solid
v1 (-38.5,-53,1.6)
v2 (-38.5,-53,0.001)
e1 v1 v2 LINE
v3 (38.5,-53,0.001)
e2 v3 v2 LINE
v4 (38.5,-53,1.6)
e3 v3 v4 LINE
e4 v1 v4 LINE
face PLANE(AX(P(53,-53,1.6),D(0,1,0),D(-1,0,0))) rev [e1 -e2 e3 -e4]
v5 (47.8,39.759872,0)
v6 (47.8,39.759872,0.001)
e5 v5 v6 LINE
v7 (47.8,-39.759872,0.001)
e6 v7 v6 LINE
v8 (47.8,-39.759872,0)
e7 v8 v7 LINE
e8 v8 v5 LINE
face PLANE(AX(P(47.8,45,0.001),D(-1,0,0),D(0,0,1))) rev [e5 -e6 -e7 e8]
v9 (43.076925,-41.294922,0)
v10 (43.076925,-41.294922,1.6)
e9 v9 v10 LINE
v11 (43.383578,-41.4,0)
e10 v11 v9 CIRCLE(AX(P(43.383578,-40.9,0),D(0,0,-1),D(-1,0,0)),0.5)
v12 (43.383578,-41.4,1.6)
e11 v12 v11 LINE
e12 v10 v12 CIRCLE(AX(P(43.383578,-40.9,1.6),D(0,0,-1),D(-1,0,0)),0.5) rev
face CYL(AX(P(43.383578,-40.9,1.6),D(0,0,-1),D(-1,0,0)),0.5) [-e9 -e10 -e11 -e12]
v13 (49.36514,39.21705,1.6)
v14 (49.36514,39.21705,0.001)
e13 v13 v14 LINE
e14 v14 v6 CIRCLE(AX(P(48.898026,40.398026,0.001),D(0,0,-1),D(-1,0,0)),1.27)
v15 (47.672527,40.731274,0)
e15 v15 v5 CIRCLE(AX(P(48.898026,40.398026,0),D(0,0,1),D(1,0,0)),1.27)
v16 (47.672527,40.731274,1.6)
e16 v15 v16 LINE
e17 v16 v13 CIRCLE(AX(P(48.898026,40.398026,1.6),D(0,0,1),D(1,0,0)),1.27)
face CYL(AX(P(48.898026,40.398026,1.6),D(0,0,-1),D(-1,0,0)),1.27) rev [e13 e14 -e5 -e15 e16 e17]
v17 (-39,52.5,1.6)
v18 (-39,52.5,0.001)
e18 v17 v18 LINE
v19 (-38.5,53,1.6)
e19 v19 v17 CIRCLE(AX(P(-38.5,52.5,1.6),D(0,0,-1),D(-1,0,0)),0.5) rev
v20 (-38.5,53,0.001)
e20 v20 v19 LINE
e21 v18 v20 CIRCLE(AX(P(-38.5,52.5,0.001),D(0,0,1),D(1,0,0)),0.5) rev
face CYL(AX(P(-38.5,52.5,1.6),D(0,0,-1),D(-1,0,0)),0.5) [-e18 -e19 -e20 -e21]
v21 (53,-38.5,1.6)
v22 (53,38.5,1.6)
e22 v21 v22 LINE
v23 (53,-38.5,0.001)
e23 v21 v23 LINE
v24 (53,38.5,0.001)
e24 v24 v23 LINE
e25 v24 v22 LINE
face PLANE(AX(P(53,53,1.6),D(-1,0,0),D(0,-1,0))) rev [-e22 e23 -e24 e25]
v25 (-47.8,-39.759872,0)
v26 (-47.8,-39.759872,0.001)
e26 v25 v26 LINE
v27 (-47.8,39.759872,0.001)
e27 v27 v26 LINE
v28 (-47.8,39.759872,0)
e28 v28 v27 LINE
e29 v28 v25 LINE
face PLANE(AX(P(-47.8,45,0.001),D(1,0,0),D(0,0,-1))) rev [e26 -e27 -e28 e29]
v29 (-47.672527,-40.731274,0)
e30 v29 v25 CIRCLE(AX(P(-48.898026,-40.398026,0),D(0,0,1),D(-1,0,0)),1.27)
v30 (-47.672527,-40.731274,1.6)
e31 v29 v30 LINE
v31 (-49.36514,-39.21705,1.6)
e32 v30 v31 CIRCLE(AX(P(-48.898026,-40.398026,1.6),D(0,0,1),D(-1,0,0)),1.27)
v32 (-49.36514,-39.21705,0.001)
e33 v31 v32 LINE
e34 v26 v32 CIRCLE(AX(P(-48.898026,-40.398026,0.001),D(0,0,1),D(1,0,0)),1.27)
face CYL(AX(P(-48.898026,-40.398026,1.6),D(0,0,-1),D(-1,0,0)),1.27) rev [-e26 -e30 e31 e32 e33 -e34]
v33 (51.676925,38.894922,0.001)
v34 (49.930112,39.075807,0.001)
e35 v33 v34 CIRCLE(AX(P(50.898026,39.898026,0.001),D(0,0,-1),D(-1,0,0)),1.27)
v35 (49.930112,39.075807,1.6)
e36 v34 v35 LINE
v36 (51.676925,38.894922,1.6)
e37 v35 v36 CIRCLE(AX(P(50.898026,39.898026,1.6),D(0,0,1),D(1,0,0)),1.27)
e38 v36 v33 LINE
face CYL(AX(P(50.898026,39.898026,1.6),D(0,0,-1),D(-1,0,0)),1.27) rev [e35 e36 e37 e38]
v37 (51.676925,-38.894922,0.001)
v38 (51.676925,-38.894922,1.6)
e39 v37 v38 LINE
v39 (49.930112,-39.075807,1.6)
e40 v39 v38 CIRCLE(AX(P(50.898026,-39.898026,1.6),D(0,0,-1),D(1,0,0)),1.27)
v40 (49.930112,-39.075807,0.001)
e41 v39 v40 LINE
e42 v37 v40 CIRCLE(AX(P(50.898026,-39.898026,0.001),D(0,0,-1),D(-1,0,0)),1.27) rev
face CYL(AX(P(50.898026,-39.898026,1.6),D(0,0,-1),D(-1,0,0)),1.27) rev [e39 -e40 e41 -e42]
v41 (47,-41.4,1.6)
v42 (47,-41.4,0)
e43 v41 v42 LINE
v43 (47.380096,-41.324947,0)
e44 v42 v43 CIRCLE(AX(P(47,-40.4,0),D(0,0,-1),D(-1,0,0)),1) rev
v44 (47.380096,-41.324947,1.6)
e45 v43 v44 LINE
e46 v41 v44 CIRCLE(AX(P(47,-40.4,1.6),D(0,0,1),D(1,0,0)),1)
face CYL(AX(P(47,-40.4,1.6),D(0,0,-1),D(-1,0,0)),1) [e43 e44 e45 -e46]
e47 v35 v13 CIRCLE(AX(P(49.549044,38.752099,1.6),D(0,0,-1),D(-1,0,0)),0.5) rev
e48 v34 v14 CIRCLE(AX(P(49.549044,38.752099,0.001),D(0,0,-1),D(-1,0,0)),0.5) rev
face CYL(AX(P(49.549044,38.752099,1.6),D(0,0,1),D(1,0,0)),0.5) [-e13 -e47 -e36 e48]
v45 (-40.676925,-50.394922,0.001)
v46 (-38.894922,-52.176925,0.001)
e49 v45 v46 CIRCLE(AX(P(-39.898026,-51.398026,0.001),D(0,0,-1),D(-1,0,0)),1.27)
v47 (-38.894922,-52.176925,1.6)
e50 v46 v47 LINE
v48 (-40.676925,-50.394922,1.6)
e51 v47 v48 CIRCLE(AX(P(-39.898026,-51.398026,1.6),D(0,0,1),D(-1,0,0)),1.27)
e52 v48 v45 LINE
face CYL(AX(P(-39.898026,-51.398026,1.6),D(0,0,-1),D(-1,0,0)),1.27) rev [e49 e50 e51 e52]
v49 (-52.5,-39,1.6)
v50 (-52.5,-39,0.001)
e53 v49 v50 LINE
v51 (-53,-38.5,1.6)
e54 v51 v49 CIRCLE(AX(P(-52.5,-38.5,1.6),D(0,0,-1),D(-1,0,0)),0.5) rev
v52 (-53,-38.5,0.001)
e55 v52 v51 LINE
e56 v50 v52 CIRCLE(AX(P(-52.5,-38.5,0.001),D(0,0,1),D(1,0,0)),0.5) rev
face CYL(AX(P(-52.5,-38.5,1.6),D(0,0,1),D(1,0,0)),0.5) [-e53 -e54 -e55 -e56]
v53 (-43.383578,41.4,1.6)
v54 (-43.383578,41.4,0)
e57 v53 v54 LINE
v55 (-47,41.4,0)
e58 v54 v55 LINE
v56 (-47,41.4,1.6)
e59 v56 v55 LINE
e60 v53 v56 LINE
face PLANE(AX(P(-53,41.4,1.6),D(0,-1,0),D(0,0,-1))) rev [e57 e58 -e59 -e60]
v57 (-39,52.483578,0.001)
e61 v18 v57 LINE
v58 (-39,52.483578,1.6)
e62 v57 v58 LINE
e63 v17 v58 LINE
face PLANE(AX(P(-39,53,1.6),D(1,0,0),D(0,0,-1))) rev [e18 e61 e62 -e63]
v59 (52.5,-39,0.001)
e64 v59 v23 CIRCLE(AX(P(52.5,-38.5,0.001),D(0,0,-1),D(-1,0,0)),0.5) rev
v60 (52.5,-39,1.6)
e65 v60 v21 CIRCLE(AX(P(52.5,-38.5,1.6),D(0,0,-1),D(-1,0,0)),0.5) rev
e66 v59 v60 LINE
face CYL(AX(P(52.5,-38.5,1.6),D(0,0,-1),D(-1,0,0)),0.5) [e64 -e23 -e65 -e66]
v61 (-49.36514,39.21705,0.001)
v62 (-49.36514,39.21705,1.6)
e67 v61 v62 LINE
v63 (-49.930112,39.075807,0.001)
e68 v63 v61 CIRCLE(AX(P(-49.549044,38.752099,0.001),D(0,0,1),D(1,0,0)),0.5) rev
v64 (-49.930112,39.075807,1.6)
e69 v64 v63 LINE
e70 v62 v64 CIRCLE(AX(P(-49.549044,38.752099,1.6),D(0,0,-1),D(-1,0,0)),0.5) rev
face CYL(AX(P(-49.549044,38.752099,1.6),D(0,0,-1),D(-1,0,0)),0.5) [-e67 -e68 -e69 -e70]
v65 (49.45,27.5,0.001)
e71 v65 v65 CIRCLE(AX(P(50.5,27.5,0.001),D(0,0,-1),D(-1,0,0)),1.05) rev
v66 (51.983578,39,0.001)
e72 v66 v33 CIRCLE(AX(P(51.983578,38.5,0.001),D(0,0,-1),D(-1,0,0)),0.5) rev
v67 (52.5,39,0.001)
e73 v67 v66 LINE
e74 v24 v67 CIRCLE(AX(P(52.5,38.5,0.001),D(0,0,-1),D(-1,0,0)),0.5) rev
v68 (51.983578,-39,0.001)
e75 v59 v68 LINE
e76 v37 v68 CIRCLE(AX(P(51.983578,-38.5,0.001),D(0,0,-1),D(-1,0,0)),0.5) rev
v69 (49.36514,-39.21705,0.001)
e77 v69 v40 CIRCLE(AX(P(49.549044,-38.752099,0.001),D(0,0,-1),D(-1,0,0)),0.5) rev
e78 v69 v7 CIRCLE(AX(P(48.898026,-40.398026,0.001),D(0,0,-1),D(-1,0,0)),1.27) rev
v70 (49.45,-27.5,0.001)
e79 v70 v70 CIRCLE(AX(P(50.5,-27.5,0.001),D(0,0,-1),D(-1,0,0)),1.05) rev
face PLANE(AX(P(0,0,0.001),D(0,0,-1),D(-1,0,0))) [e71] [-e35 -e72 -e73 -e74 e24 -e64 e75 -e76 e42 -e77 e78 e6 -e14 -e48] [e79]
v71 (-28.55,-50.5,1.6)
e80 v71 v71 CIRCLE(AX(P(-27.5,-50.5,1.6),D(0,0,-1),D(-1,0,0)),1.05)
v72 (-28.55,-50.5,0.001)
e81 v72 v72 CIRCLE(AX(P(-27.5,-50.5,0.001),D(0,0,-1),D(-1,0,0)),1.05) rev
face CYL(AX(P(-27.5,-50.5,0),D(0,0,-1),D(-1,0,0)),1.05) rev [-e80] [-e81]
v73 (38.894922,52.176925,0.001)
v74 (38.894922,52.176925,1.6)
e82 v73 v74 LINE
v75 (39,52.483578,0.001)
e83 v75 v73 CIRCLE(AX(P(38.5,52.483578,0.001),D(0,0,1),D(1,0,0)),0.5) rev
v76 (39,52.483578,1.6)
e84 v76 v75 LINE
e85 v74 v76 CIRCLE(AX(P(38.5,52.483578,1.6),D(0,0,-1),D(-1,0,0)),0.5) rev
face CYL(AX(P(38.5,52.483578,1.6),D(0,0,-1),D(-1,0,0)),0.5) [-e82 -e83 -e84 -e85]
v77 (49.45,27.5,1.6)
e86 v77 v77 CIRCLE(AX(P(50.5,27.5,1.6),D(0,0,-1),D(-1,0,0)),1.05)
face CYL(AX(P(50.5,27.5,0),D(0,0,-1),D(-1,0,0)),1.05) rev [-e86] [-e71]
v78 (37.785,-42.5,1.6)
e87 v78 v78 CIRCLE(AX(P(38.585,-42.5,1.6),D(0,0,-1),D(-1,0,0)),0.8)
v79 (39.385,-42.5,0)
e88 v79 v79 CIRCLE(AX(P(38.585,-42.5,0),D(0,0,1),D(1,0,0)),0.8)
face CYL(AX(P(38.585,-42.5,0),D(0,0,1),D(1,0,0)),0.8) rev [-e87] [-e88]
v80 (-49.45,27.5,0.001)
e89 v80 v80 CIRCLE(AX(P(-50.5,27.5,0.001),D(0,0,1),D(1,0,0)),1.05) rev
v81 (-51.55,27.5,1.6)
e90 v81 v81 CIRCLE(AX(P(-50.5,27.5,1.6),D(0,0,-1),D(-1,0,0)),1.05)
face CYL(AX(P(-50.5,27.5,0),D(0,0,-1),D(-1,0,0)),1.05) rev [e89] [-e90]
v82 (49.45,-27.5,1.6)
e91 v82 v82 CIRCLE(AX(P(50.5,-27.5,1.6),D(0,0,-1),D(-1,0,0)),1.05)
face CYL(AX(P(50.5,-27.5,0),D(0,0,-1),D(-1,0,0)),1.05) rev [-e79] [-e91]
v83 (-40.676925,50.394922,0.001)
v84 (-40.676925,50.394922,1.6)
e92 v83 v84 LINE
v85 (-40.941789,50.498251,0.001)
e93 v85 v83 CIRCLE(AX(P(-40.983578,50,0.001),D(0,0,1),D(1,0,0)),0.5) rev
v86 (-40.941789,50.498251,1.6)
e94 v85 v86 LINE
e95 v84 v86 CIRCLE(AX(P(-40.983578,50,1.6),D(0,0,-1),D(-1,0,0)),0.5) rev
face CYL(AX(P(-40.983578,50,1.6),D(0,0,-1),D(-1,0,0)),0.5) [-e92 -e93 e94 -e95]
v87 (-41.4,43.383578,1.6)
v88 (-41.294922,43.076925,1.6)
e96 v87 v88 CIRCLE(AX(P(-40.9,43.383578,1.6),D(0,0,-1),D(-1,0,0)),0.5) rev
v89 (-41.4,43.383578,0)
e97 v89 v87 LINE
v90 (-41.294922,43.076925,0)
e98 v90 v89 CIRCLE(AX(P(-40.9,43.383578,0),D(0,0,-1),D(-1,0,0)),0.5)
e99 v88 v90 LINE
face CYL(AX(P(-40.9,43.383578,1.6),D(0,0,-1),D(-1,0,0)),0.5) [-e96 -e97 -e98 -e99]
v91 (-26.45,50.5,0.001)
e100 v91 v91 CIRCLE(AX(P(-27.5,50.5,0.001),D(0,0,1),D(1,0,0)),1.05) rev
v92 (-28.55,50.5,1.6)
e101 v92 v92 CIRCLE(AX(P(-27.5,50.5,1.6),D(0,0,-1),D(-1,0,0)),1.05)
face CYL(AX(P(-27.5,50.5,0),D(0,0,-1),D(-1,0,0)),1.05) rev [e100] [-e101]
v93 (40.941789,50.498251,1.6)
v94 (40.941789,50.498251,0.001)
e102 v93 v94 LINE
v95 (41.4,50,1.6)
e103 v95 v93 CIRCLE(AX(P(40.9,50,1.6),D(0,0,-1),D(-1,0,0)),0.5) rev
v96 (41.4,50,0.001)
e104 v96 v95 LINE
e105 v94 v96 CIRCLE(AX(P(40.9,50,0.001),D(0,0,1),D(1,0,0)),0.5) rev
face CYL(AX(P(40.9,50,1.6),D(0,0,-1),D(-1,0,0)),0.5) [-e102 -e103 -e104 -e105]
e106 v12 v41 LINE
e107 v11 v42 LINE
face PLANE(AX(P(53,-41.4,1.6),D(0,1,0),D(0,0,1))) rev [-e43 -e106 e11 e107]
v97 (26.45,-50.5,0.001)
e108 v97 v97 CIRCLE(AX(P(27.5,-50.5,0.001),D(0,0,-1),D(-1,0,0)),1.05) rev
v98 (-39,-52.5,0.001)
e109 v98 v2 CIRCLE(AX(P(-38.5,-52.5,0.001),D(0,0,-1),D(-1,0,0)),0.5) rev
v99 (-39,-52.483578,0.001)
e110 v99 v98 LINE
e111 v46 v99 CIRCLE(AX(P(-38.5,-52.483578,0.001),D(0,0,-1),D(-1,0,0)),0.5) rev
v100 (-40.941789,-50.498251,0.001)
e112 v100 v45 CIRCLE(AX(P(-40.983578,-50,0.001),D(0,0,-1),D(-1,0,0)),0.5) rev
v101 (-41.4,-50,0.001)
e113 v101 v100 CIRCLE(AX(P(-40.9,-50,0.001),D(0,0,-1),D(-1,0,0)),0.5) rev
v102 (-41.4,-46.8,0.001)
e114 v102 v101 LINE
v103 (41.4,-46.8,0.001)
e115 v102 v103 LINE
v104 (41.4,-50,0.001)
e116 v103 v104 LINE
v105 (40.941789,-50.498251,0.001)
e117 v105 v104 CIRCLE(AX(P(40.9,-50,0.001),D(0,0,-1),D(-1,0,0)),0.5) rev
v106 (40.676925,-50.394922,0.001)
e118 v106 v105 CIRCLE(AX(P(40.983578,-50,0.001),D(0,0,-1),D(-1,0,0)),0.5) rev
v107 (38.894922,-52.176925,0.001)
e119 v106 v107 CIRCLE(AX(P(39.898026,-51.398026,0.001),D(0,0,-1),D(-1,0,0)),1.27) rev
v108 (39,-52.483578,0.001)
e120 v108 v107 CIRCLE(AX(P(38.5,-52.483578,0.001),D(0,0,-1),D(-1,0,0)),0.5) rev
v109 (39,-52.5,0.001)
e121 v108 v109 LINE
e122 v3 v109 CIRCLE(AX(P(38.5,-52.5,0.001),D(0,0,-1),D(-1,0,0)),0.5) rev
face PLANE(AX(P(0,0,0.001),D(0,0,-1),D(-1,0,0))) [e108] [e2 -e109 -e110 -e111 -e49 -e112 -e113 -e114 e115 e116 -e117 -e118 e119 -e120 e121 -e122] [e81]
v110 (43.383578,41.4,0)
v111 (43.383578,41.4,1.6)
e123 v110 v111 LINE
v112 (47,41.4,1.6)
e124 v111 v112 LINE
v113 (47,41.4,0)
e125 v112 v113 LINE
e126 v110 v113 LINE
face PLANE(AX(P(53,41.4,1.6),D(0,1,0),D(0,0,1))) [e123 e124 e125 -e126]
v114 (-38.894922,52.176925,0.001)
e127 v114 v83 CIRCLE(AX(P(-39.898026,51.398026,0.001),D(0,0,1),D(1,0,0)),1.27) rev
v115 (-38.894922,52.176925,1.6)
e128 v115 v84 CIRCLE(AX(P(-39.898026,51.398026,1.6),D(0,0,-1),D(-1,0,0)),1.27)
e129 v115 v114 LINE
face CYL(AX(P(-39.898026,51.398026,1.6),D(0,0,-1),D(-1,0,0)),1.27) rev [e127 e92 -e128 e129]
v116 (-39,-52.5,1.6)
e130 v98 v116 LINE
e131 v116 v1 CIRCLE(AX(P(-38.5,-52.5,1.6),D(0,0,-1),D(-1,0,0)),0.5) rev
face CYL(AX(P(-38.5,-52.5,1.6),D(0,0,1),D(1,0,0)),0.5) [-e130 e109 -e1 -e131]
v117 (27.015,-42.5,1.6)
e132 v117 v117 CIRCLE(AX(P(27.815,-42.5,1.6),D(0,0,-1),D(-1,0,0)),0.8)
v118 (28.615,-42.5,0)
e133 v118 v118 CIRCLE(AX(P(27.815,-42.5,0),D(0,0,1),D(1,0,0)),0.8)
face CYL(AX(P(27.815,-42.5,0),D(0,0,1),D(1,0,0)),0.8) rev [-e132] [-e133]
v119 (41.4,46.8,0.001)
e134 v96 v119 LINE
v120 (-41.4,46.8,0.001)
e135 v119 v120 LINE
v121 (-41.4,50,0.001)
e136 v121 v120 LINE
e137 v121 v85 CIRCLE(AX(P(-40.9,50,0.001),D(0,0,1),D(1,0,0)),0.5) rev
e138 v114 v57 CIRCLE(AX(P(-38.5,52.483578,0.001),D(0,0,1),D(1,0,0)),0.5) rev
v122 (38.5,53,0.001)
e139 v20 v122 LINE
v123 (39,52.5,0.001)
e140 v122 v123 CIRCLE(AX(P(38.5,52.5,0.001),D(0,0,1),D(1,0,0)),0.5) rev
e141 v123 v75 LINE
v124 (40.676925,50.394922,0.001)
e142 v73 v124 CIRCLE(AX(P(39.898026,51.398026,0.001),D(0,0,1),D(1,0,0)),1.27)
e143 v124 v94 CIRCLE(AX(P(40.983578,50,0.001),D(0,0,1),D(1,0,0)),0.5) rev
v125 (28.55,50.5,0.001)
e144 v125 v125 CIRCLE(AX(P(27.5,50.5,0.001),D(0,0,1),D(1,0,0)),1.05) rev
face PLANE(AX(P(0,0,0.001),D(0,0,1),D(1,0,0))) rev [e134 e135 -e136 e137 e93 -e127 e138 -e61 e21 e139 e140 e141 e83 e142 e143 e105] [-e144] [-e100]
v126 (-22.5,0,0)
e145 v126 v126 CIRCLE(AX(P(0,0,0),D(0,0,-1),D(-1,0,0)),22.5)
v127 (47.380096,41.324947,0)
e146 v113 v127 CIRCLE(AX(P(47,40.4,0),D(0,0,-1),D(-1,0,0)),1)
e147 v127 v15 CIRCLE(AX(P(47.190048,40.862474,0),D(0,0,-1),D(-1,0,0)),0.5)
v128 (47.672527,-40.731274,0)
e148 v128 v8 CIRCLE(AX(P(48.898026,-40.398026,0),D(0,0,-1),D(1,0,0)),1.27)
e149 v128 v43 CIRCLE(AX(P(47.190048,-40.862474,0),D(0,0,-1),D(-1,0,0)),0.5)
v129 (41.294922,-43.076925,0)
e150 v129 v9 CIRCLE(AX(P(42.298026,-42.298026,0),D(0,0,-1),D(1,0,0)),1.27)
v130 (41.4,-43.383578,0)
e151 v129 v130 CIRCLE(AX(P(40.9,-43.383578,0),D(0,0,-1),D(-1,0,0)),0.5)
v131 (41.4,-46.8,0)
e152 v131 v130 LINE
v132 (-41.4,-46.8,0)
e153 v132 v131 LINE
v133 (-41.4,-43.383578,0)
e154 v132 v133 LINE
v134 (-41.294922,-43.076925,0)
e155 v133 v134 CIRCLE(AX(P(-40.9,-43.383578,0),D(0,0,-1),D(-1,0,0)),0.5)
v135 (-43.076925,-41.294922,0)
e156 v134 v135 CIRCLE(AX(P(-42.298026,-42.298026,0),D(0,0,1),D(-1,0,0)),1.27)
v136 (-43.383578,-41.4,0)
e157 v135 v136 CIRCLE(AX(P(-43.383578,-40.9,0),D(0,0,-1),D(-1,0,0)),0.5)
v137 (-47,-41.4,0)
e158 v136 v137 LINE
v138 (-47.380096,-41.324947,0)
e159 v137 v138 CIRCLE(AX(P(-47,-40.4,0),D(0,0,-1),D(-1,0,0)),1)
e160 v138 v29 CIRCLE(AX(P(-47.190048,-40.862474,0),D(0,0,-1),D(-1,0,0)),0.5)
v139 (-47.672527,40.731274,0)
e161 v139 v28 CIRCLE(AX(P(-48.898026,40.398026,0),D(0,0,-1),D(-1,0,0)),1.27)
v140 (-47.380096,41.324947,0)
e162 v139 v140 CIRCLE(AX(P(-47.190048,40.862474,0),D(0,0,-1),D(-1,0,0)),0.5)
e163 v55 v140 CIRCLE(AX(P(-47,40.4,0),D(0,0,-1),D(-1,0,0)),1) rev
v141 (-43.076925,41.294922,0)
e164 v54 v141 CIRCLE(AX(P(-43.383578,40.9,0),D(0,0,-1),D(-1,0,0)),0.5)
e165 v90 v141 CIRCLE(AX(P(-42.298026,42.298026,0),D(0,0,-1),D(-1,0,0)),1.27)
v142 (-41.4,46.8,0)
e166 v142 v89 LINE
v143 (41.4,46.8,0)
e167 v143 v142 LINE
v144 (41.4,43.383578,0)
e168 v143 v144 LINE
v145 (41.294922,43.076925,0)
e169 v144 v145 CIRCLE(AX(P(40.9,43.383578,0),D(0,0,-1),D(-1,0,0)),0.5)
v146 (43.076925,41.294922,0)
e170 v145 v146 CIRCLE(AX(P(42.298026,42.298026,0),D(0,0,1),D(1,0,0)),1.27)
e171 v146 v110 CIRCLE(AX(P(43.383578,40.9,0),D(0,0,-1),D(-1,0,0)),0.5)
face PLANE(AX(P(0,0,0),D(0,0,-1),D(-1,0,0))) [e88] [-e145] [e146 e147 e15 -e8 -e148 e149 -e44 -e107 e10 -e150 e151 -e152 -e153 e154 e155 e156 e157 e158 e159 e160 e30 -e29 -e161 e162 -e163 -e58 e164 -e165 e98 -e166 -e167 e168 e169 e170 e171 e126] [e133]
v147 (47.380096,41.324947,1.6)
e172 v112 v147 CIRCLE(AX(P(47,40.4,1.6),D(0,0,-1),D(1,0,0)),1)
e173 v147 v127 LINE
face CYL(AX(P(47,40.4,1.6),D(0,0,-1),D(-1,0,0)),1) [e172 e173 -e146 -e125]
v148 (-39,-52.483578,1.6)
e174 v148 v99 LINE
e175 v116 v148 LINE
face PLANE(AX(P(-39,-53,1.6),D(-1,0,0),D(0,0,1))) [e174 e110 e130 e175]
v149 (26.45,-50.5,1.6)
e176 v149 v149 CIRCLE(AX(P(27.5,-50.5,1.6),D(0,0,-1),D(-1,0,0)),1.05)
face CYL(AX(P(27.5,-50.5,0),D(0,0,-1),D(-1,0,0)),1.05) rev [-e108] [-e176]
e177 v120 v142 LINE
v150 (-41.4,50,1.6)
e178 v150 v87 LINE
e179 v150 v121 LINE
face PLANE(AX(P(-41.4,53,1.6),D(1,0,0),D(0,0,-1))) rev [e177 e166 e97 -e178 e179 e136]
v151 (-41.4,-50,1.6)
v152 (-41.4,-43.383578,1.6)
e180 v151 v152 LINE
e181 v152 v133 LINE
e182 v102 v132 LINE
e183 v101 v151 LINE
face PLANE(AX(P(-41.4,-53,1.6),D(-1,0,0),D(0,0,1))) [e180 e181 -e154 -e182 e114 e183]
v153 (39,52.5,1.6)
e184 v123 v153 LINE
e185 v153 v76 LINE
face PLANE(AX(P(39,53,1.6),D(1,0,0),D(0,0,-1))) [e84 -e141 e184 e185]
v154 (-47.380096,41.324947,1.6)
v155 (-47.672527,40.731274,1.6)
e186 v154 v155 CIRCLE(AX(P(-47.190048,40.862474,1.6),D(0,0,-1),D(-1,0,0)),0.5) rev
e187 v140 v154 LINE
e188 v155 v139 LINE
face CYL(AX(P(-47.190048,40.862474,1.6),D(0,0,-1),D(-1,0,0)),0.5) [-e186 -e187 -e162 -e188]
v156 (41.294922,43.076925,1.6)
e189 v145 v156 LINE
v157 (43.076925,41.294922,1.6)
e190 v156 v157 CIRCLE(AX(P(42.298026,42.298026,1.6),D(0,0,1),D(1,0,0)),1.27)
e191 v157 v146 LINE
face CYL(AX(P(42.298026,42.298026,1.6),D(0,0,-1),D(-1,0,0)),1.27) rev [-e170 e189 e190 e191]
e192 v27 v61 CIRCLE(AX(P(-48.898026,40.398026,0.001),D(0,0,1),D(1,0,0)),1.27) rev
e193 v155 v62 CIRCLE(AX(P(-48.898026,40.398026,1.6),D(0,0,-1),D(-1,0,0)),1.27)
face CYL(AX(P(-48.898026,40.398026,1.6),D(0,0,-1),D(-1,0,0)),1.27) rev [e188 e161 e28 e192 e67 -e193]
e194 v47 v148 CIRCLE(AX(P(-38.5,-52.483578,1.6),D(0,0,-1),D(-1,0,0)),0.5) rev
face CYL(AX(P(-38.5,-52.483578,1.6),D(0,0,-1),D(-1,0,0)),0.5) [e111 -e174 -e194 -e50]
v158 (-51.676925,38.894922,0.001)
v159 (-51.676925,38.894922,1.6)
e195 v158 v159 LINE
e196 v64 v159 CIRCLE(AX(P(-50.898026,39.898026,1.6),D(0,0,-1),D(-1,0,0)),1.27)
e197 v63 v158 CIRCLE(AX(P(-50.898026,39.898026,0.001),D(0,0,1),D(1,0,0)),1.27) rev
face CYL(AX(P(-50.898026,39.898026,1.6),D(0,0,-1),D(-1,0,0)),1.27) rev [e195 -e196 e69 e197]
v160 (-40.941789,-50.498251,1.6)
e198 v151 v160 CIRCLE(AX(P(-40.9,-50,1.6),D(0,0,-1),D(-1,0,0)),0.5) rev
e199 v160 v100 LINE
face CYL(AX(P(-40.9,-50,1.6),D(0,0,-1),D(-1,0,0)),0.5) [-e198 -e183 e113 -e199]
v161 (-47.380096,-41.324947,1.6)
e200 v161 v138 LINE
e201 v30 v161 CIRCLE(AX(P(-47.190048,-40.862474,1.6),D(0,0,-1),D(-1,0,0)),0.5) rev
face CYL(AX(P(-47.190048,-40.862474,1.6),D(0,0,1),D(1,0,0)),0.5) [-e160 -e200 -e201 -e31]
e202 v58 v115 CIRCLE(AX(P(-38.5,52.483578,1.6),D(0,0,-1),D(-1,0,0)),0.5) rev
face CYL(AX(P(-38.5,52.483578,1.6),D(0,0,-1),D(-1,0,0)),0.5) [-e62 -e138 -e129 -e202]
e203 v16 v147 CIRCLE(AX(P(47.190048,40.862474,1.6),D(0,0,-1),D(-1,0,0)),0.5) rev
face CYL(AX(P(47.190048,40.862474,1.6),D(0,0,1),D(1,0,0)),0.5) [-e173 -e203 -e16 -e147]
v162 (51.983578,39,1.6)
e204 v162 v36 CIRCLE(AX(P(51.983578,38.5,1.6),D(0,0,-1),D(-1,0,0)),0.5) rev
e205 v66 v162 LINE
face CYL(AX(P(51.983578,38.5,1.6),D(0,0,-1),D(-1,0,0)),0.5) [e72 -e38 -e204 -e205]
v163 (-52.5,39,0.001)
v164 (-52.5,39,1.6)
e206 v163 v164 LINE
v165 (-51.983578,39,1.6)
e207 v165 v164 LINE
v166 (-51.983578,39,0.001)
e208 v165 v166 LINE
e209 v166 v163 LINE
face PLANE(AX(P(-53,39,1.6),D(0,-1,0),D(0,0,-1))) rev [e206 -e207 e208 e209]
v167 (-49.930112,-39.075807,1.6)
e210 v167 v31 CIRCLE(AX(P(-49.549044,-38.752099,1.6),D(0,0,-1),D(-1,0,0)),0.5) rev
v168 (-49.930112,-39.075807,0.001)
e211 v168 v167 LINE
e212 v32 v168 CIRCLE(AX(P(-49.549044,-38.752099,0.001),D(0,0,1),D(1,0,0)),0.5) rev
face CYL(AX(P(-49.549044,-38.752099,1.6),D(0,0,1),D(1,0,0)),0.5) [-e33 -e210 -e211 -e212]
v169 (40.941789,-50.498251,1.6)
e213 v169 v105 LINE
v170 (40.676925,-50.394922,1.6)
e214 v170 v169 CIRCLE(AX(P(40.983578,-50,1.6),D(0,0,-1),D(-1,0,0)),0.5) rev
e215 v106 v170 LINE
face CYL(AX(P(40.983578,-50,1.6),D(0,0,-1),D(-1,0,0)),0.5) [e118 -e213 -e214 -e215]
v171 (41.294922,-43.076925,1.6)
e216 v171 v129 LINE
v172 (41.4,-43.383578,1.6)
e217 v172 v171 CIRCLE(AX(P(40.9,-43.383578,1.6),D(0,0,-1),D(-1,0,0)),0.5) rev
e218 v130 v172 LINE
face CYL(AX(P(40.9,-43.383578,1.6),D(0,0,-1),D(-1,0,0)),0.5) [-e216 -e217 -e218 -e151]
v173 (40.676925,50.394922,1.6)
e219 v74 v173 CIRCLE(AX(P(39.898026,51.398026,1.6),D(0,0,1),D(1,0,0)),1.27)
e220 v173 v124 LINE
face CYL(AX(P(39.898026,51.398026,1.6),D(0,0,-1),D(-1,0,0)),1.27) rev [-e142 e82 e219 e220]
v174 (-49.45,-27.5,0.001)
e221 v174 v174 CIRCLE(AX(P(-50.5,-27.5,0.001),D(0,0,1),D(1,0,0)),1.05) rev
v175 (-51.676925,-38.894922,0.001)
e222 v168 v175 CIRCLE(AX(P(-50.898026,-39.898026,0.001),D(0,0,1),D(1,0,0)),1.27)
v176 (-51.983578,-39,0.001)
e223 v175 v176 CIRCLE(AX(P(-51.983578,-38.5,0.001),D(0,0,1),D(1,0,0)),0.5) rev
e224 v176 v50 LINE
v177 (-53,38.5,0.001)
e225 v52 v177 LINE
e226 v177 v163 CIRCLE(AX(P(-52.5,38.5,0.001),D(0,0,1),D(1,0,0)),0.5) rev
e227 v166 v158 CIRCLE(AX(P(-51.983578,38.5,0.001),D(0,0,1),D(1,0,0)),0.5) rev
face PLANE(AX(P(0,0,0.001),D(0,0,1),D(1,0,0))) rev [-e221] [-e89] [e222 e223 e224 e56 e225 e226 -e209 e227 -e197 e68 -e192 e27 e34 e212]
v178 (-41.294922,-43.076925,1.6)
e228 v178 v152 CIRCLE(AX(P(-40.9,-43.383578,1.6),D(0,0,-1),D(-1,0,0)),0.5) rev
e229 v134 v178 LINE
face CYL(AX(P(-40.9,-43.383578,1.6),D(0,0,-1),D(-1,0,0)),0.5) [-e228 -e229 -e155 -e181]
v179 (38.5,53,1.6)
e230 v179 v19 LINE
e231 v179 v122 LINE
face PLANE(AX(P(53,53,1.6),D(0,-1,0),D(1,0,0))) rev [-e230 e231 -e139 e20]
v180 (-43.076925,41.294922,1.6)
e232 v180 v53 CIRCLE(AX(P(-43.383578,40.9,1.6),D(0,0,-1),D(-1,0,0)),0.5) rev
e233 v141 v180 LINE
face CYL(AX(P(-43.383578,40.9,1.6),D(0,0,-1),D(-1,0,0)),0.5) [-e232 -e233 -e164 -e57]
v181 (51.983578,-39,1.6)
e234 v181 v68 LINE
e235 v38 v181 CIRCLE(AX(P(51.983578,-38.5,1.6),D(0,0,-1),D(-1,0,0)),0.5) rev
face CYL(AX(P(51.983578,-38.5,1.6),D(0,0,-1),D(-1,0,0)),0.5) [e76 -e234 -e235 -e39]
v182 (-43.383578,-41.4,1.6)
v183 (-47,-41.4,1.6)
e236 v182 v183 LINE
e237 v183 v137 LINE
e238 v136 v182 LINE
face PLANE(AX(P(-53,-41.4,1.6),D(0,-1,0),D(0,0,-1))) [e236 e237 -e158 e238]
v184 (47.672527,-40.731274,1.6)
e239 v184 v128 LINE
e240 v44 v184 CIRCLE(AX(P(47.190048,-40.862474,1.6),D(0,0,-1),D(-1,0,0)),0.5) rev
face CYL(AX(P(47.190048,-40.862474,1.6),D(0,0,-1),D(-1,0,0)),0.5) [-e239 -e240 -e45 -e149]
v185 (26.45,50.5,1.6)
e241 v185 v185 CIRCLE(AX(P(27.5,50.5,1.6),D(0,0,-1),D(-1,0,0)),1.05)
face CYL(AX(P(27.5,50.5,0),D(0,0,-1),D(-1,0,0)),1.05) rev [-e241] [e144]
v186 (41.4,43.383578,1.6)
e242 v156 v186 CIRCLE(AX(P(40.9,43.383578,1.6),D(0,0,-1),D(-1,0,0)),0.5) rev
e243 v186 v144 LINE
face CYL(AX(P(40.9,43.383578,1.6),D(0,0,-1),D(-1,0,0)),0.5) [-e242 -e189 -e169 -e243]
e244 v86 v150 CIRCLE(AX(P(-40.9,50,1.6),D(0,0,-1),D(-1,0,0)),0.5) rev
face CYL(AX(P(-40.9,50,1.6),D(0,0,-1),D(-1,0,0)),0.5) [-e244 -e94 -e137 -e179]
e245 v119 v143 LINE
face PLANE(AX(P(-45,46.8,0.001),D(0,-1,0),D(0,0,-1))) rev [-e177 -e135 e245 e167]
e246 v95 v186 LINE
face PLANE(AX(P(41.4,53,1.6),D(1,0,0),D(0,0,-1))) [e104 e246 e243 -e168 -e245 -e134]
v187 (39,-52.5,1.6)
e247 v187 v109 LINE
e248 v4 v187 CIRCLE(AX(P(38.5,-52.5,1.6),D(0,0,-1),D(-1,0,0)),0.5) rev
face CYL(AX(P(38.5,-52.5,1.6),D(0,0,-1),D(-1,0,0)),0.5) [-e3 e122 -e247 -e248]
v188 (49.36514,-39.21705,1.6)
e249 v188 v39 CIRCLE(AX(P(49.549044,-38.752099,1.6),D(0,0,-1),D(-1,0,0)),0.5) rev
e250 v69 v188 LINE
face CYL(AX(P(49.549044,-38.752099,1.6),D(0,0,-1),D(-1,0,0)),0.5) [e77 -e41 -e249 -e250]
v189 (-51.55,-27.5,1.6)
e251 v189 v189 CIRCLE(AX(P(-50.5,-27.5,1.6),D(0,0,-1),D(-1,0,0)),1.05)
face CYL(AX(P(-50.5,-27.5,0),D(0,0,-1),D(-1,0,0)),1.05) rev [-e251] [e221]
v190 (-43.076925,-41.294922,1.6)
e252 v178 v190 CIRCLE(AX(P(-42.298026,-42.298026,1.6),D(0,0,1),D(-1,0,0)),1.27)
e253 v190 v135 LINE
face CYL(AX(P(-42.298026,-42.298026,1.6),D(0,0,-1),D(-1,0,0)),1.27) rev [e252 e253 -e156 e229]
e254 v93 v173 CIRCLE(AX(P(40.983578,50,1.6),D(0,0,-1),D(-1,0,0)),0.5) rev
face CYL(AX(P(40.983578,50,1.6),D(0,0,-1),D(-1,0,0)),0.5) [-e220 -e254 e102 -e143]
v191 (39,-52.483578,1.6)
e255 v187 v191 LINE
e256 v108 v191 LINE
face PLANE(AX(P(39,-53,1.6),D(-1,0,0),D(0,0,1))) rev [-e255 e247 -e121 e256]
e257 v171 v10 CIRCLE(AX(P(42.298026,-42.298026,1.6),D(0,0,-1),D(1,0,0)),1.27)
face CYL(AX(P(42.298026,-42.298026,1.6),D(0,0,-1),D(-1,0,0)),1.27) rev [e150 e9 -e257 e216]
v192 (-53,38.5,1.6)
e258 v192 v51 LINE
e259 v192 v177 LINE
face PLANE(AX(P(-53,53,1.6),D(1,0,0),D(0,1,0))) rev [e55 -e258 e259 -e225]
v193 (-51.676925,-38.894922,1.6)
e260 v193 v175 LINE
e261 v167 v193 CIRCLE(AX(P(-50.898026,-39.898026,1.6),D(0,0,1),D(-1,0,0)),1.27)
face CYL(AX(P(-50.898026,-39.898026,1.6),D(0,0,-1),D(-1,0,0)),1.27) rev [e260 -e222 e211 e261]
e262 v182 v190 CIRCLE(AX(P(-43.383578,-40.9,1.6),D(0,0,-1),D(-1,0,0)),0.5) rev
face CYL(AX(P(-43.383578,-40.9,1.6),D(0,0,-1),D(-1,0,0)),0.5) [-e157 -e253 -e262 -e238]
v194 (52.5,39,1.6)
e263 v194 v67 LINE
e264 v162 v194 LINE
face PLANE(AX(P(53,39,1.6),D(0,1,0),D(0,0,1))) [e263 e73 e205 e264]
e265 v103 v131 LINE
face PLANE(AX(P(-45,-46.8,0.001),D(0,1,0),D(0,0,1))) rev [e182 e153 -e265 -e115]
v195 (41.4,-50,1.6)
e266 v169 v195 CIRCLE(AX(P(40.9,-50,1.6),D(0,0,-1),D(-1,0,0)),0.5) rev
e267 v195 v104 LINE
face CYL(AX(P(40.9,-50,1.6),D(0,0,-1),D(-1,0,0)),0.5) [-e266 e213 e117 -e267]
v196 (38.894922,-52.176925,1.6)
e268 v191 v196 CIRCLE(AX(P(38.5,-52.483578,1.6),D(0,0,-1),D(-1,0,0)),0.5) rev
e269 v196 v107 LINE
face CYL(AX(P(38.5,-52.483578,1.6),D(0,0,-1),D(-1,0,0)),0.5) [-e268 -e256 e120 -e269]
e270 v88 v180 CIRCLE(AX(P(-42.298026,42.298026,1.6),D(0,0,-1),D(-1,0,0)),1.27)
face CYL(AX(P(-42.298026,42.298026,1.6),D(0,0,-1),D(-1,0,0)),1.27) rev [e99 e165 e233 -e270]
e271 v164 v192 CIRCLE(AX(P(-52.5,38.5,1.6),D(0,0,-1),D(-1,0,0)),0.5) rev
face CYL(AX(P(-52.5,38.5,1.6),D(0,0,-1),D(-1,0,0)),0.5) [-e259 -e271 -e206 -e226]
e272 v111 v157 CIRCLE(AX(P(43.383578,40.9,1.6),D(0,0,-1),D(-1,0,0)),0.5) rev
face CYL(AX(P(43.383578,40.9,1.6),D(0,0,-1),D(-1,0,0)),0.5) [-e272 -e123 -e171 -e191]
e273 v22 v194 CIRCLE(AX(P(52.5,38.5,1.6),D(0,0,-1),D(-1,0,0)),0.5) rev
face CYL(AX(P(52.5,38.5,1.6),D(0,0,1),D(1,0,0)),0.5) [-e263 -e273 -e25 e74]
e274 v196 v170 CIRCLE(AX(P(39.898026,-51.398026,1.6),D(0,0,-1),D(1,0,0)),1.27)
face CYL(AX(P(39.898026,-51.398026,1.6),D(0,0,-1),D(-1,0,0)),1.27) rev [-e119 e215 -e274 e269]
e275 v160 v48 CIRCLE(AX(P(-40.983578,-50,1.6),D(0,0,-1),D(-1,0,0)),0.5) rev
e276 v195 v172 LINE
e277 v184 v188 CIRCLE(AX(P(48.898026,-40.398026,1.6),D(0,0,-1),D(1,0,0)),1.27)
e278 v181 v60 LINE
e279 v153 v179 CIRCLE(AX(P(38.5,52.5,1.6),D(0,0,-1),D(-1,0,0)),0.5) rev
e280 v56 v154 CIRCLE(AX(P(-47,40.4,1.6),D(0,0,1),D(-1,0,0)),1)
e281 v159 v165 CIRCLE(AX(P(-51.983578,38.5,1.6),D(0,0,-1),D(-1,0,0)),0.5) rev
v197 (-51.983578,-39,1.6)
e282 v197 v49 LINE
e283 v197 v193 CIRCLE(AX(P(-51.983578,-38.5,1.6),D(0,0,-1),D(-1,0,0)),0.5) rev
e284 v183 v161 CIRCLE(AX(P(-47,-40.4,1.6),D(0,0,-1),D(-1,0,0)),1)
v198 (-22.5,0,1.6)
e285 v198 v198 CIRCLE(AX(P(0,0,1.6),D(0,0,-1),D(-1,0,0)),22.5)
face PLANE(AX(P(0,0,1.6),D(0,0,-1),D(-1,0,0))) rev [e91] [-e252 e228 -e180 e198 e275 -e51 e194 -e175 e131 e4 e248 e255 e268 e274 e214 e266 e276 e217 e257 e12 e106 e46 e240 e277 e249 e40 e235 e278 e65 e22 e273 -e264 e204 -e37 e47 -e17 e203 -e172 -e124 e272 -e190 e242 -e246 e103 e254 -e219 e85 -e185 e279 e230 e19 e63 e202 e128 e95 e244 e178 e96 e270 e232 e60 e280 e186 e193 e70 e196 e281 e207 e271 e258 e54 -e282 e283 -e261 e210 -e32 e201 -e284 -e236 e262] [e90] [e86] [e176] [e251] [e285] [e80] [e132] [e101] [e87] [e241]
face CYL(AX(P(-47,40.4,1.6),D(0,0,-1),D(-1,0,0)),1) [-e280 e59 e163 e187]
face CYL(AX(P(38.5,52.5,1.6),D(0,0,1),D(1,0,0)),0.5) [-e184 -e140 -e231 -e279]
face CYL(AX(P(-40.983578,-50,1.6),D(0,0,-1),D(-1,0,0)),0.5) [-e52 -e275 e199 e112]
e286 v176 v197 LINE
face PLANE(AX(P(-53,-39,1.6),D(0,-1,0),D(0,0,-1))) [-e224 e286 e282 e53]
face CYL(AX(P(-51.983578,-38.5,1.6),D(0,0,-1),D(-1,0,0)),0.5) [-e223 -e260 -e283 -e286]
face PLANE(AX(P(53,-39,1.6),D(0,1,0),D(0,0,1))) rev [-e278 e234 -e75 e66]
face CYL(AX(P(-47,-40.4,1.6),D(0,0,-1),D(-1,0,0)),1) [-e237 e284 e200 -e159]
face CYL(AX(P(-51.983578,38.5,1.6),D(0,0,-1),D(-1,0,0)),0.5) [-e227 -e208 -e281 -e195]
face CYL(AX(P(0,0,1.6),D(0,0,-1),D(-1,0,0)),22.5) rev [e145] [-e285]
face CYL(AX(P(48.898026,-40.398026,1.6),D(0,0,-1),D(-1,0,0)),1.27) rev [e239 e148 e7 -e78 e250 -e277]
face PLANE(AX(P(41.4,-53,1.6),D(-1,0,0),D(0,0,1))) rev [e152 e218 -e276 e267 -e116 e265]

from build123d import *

# Parameters (mm, degrees)
SKETCH1_W                           = 106
SKETCH1_H                           = 106
MAINOUTLINE_DEPTH                   = 1.6
SKETCH4_W                           = 11.6
SKETCH4_H                           = 11.6
RAILCUTOUTS_DEPTH                   = 75.970394157
SKETCH13_W                          = 2.4
SKETCH13_H                          = 2.5
FILLETCUTOUTS_DEPTH                 = 75.970394157
DOGBONE_DEPTH                       = 75.970394157
SKETCH_PATTERN1_DEPTH               = 1.6
MIRROR2_COPY_1_SKETCH_W             = 11.6
MIRROR2_COPY_1_SKETCH_H             = 11.6
MIRROR2_COPY_1_DEPTH                = 75.970394157
MIRROR2_COPY_2_SKETCH_W             = 2.4
MIRROR2_COPY_2_SKETCH_H             = 2.5
MIRROR2_COPY_2_DEPTH                = 75.970394157
MIRROR2_COPY_3_DEPTH                = 75.970394157
MIRROR2_COPY_4_DEPTH                = 1.6
FILLET1_R                           = 0.5
M2_CLEARANCE_HOLE1_D                = 2.1
INTERBOARDCONNECTORHOLES_DEPTH      = 75.970394157
INTERBOARDCONNECTORHOLES_DEPTH_BACK = 75.970394157
SKETCH12_R                          = 0.8
CUT_EXTRUDE2_DEPTH                  = 75.970394157
CUT_EXTRUDE2_DEPTH_BACK             = 75.970394157
SKETCH11_R                          = 22.5
SKETCH15_W                          = 90
SKETCH15_H                          = 6.2
SKETCH15_W_2                        = 5.2
SKETCH15_H_2                        = 90
CUT_EXTRUDE5_DEPTH                  = 0.001


# Read off the part's stored shape, not the designer's step: Sketch-Pattern1
with BuildPart() as part:
    # Sketch1 → mainOutline (new body)
    with BuildSketch(Plane.XY):
        Rectangle(SKETCH1_W, SKETCH1_H)
    extrude(amount=MAINOUTLINE_DEPTH)

    # Sketch4 → railCutouts (cut, through all)
    with BuildSketch(Plane(origin=(0, 0, 0), x_dir=(-1, 0, 0), z_dir=(0, 0, -1))):
        with Locations((47.2, 47.2)):
            Rectangle(SKETCH4_W, SKETCH4_H)
    railcutouts = extrude(amount=-RAILCUTOUTS_DEPTH, mode=Mode.SUBTRACT)

    # Sketch13 → filletCutouts (cut, symmetric)
    with BuildSketch(Plane(origin=(0, 0, 0), x_dir=(-1, 0, 0), z_dir=(0, 0, -1))):
        with BuildLine():
            Line((48, 39.5), (48, 40.4))
            ThreePointArc((48, 40.4), (47.707106781, 41.107106781), (47, 41.4))
            Line((47, 41.4), (53, 41.4))
            Line((53, 41.4), (53, 39))
            Line((53, 39), (50, 39))
            Line((50, 39), (50, 39.5))
            Line((50, 39.5), (48, 39.5))
        make_face()
        with Locations((40.2, 51.75)):
            Rectangle(SKETCH13_W, SKETCH13_H)
    filletcutouts = extrude(amount=FILLETCUTOUTS_DEPTH, both=True, mode=Mode.SUBTRACT)

    # Sketch5 → dogbone (cut, through all)
    with BuildSketch(Plane(origin=(0, 0, 0), x_dir=(-1, 0, 0), z_dir=(0, 0, -1))):
        with BuildLine():
            Line((41.4, 43.196051224), (44.582309033, 46.378360258))
            ThreePointArc((44.582309033, 46.378360258), (46.378360258, 46.378360258), (46.378360258, 44.582309033))
            Line((46.378360258, 44.582309033), (43.196051224, 41.4))
            ThreePointArc((43.196051224, 41.4), (41.4, 41.4), (41.4, 43.196051224))
        make_face()
    dogbone = extrude(amount=-DOGBONE_DEPTH, mode=Mode.SUBTRACT)

    # Sketch-Pattern1 outline → Sketch-Pattern1 (cut)
    with BuildSketch(Plane.XY):
        with BuildLine():
            ThreePointArc((-51.796051224, 39), (-50.898025612, 38.628025612), (-50, 39))
            Line((-50, 39), (-51.796051224, 39))
        make_face()
        with BuildLine():
            Line((-48, 40.4), (-48, 39.5))
            ThreePointArc((-48, 39.5), (-47.640251053, 40.222232671), (-47.788196764, 41.015423319))
            ThreePointArc((-47.788196764, 41.015423319), (-47.945567756, 40.725425288), (-48, 40.4))
        make_face()
        with BuildLine():
            ThreePointArc((-50, 39), (-49.837206518, 39.199768603), (-49.718090983, 39.428287097))
            ThreePointArc((-49.718090983, 39.428287097), (-48.845062088, 39.129130476), (-48, 39.5))
            Line((-48, 39.5), (-50, 39.5))
            Line((-50, 39.5), (-50, 39))
        make_face()
        with BuildLine():
            ThreePointArc((-40.796051224, 50.5), (-39.898025612, 50.128025612), (-39, 50.5))
            Line((-39, 50.5), (-40.796051224, 50.5))
        make_face()
        with BuildLine():
            ThreePointArc((-39, 50.5), (-38.628025612, 51.398025612), (-39, 52.296051224))
            Line((-39, 52.296051224), (-39, 50.5))
        make_face()
    sketch_pattern1 = extrude(amount=SKETCH_PATTERN1_DEPTH, mode=Mode.SUBTRACT)

    # Mirror1: railCutouts, filletCutouts, dogbone, Sketch-Pattern1 across plane
    add(railcutouts.mirror(Plane(origin=(0, 0, 0), x_dir=(0, 0, 1), z_dir=(1, 0, 0))), mode=Mode.SUBTRACT)
    add(filletcutouts.mirror(Plane(origin=(0, 0, 0), x_dir=(0, 0, 1), z_dir=(1, 0, 0))), mode=Mode.SUBTRACT)
    add(dogbone.mirror(Plane(origin=(0, 0, 0), x_dir=(0, 0, 1), z_dir=(1, 0, 0))), mode=Mode.SUBTRACT)
    add(sketch_pattern1.mirror(Plane(origin=(0, 0, 0), x_dir=(0, 0, 1), z_dir=(1, 0, 0))), mode=Mode.SUBTRACT)

    # Mirror2: railCutouts, filletCutouts, dogbone, Sketch-Pattern1 across plane
    add(railcutouts.mirror(Plane.ZX), mode=Mode.SUBTRACT)
    add(filletcutouts.mirror(Plane.ZX), mode=Mode.SUBTRACT)
    add(dogbone.mirror(Plane.ZX), mode=Mode.SUBTRACT)
    add(sketch_pattern1.mirror(Plane.ZX), mode=Mode.SUBTRACT)

    # Mirror2 copy 1 sketch → Mirror2 copy 1 (cut, through all)
    with BuildSketch(Plane(origin=(0, 0, 0), x_dir=(1, 0, 0), z_dir=(0, 0, -1))):
        with Locations((47.2, 47.2)):
            Rectangle(MIRROR2_COPY_1_SKETCH_W, MIRROR2_COPY_1_SKETCH_H)
    extrude(amount=-MIRROR2_COPY_1_DEPTH, mode=Mode.SUBTRACT)

    # Mirror2 copy 2 sketch → Mirror2 copy 2 (cut, symmetric)
    with BuildSketch(Plane(origin=(0, 0, 0), x_dir=(1, 0, 0), z_dir=(0, 0, -1))):
        with BuildLine():
            Line((48, 39.5), (48, 40.4))
            ThreePointArc((48, 40.4), (47.707106781, 41.107106781), (47, 41.4))
            Line((47, 41.4), (53, 41.4))
            Line((53, 41.4), (53, 39))
            Line((53, 39), (50, 39))
            Line((50, 39), (50, 39.5))
            Line((50, 39.5), (48, 39.5))
        make_face()
        with Locations((40.2, 51.75)):
            Rectangle(MIRROR2_COPY_2_SKETCH_W, MIRROR2_COPY_2_SKETCH_H)
    extrude(amount=MIRROR2_COPY_2_DEPTH, both=True, mode=Mode.SUBTRACT)

    # Mirror2 copy 3 sketch → Mirror2 copy 3 (cut, through all)
    with BuildSketch(Plane(origin=(0, 0, 0), x_dir=(1, 0, 0), z_dir=(0, 0, -1))):
        with BuildLine():
            Line((41.4, 43.196051224), (44.582309033, 46.378360258))
            ThreePointArc((44.582309033, 46.378360258), (46.378360258, 46.378360258), (46.378360258, 44.582309033))
            Line((46.378360258, 44.582309033), (43.196051224, 41.4))
            ThreePointArc((43.196051224, 41.4), (41.4, 41.4), (41.4, 43.196051224))
        make_face()
    extrude(amount=-MIRROR2_COPY_3_DEPTH, mode=Mode.SUBTRACT)

    # Mirror2 copy 4 sketch → Mirror2 copy 4 (cut)
    with BuildSketch(Plane(origin=(0, 0, 0), x_dir=(-1, 0, 0), z_dir=(0, 0, 1))):
        with BuildLine():
            ThreePointArc((-51.796051224, 39), (-50.898025612, 38.628025612), (-50, 39))
            Line((-50, 39), (-51.796051224, 39))
        make_face()
        with BuildLine():
            Line((-48, 40.4), (-48, 39.5))
            ThreePointArc((-48, 39.5), (-47.640251053, 40.222232671), (-47.788196764, 41.015423319))
            ThreePointArc((-47.788196764, 41.015423319), (-47.945567756, 40.725425288), (-48, 40.4))
        make_face()
        with BuildLine():
            ThreePointArc((-50, 39), (-49.837206518, 39.199768603), (-49.718090983, 39.428287097))
            ThreePointArc((-49.718090983, 39.428287097), (-48.845062088, 39.129130476), (-48, 39.5))
            Line((-48, 39.5), (-50, 39.5))
            Line((-50, 39.5), (-50, 39))
        make_face()
        with BuildLine():
            ThreePointArc((-40.796051224, 50.5), (-39.898025612, 50.128025612), (-39, 50.5))
            Line((-39, 50.5), (-40.796051224, 50.5))
        make_face()
        with BuildLine():
            ThreePointArc((-39, 50.5), (-38.628025612, 51.398025612), (-39, 52.296051224))
            Line((-39, 52.296051224), (-39, 50.5))
        make_face()
    extrude(amount=MIRROR2_COPY_4_DEPTH, mode=Mode.SUBTRACT)

    # Fillet1
    # the kernel refuses this fillet: 0.5 mm, written as the material it takes off along each edge
    with BuildSketch(Plane(origin=(-40.796051224, 50.5, -0.468817401), x_dir=(-1, 0, 0), z_dir=(0, 0, 1)), Plane(origin=(41.4, 43.196051224, -0.468817401), x_dir=(0, 1, 0), z_dir=(0, 0, 1)), Plane(origin=(39, 52.296051224, -0.468817401), x_dir=(0, 1, 0), z_dir=(0, 0, 1)), Plane(origin=(43.196051224, -41.4, -0.468817401), x_dir=(1, 0, 0), z_dir=(0, 0, 1)), Plane(origin=(40.796051224, -50.5, -0.468817401), x_dir=(1, 0, 0), z_dir=(0, 0, 1)), Plane(origin=(51.796051224, -39, -0.468817401), x_dir=(1, 0, 0), z_dir=(0, 0, 1)), Plane(origin=(-41.4, -43.196051224, -0.468817401), x_dir=(0, -1, 0), z_dir=(0, 0, 1)), Plane(origin=(-39, -52.296051224, -0.468817401), x_dir=(0, -1, 0), z_dir=(0, 0, 1)), Plane(origin=(-43.196051224, 41.4, -0.468817401), x_dir=(-1, 0, 0), z_dir=(0, 0, 1))) as fillet1_piece_1:
        with BuildLine():
            CenterArc((0.187526961, 0.5), FILLET1_R, 232.171026852, 37.828973148)
            ThreePointArc((-0.119126309, 0.105077511), (-0.057918706, 0.054403066), (0, 0))
            Line((0, 0), (0.187526961, 0))
        make_face()
    extrude(amount=2.537634803, mode=Mode.SUBTRACT)
    with BuildSketch(Plane(origin=(-39, 52.296051224, -0.468817401), x_dir=(0, 1, 0), z_dir=(0, 0, 1))) as fillet1_piece_2:
        with BuildLine():
            CenterArc((0.187526961, -0.5), FILLET1_R, 90, 37.828973148)
            ThreePointArc((-0.119126309, -0.105077511), (-0.057918706, -0.054403066), (0, 0))
            Line((0, 0), (0.187526961, 0))
        make_face()
    extrude(amount=2.537634803, mode=Mode.SUBTRACT)
    with BuildSketch(Plane(origin=(-49.718090983, 39.428287097, -1.02833381), x_dir=(-0.5154483763145984, -0.8569206330545696, 0), z_dir=(0, 0, 1)), Plane(origin=(49.718090983, 39.428287097, -1.02833381), x_dir=(-0.8580641587400395, -0.5135425001747647, 0), z_dir=(0, 0, 1)), Plane(origin=(49.718090983, -39.428287097, -1.02833381), x_dir=(0.5154483763145984, 0.8569206330545696, 0), z_dir=(0, 0, 1)), Plane(origin=(-49.718090983, -39.428287097, -1.02833381), x_dir=(0.8580641587400395, 0.5135425001747647, 0), z_dir=(0, 0, 1))) as fillet1_piece_3:
        with BuildLine():
            CenterArc((0.49230469, 0.493400112), FILLET1_R, 189.447000606, 71.233345199)
            ThreePointArc((-0.000914235, 0.411332508), (0.016306557, 0.205703513), (0, 0))
            ThreePointArc((0, 0), (0.205666762, 0.016763716), (0.411333524, 0))
        make_face()
    extrude(amount=3.65666762, mode=Mode.SUBTRACT)
    with BuildSketch(Plane(origin=(-51.796051224, 39, -0.468817401), x_dir=(0.74994384051794, -0.6615015011843909, 0), z_dir=(0, 0, 1))) as fillet1_piece_4:
        with BuildLine():
            CenterArc((0.190116062, -0.499021286), FILLET1_R, 93.585513434, 37.828973148)
            Line((-0.140634689, -0.124049366), (0, 0))
            ThreePointArc((0, 0), (0.079423486, -0.002485933), (0.158846972, 0))
        make_face()
    extrude(amount=2.537634803, mode=Mode.SUBTRACT)
    with BuildSketch(Plane(origin=(53, 39, -1.25), x_dir=(-1, 0, 0), z_dir=(0, 0, 1)), Plane(origin=(41.4, 50.5, -1.25), x_dir=(-1, 0, 0), z_dir=(0, 0, 1)), Plane(origin=(53, -39, -1.25), x_dir=(0, 1, 0), z_dir=(0, 0, 1)), Plane(origin=(41.4, -50.5, -1.25), x_dir=(0, 1, 0), z_dir=(0, 0, 1)), Plane(origin=(-53, 39, -1.25), x_dir=(0, -1, 0), z_dir=(0, 0, 1)), Plane(origin=(-53, -39, -1.25), x_dir=(1, 0, 0), z_dir=(0, 0, 1)), Plane(origin=(-41.4, -50.5, -1.25), x_dir=(1, 0, 0), z_dir=(0, 0, 1)), Plane(origin=(-41.4, 50.5, -1.25), x_dir=(0, -1, 0), z_dir=(0, 0, 1)), Plane(origin=(-39, 53, 2.85), x_dir=(1, 0, 0), z_dir=(0, 0, -1))) as fillet1_piece_5:
        with BuildLine():
            CenterArc((FILLET1_R, FILLET1_R), FILLET1_R, 180, 90)
            Line((0, FILLET1_R), (0, 0))
            Line((0, 0), (FILLET1_R, 0))
        make_face()
    extrude(amount=4.1, mode=Mode.SUBTRACT)
    with BuildSketch(Plane(origin=(39, 53, 2.85), x_dir=(-1, 0, 0), z_dir=(0, 0, -1)), Plane(origin=(39, -53, 2.85), x_dir=(0, 1, 0), z_dir=(0, 0, -1)), Plane(origin=(-39, -53, 2.85), x_dir=(1, 0, 0), z_dir=(0, 0, -1))) as fillet1_piece_6:
        with BuildLine():
            CenterArc((FILLET1_R, -FILLET1_R), FILLET1_R, 90, 90)
            Line((0, -FILLET1_R), (0, 0))
            Line((0, 0), (FILLET1_R, 0))
        make_face()
    extrude(amount=4.1, mode=Mode.SUBTRACT)
    with BuildSketch(Plane(origin=(43.196051224, 41.4, -0.468817401), x_dir=(-0.7499438406786088, -0.6615015010022407, 0), z_dir=(0, 0, 1)), Plane(origin=(40.796051224, 50.5, -0.468817401), x_dir=(-0.7499438405179647, -0.6615015011843627, 0), z_dir=(0, 0, 1)), Plane(origin=(51.796051224, 39, -0.468817401), x_dir=(-0.74994384051794, -0.6615015011843909, 0), z_dir=(0, 0, 1)), Plane(origin=(41.4, -43.196051224, -0.468817401), x_dir=(-0.6615015010022215, 0.7499438406786257, 0), z_dir=(0, 0, 1)), Plane(origin=(39, -52.296051224, -0.468817401), x_dir=(-0.6615015011843849, 0.7499438405179452, 0), z_dir=(0, 0, 1)), Plane(origin=(-43.196051224, -41.4, -0.468817401), x_dir=(0.7499438406786088, 0.6615015010022407, 0), z_dir=(0, 0, 1)), Plane(origin=(-40.796051224, -50.5, -0.468817401), x_dir=(0.7499438405179647, 0.6615015011843627, 0), z_dir=(0, 0, 1)), Plane(origin=(-51.796051224, -39, -0.468817401), x_dir=(0.74994384051794, 0.6615015011843909, 0), z_dir=(0, 0, 1)), Plane(origin=(-41.4, 43.196051224, -0.468817401), x_dir=(0.6615015010022215, -0.7499438406786257, 0), z_dir=(0, 0, 1))) as fillet1_piece_7:
        with BuildLine():
            CenterArc((0.190116062, 0.499021286), FILLET1_R, 228.585513432, 37.828973137)
            Line((-0.140634689, 0.124049366), (0, 0))
            ThreePointArc((0, 0), (0.079423486, 0.002485933), (0.158846972, 0))
        make_face()
    extrude(amount=2.537634803, mode=Mode.SUBTRACT)
    with BuildSketch(Plane(origin=(47.788196764, 41.015423319, -1.280506532), x_dir=(-0.796757139689439, 0.6042996445091655, 0), z_dir=(0, 0, 1)), Plane(origin=(-47.788196764, -41.015423319, -1.280506532), x_dir=(0.796757139689439, -0.6042996445091655, 0), z_dir=(0, 0, 1))) as fillet1_piece_8:
        with BuildLine():
            CenterArc((0.384151959, 0.483324974), FILLET1_R, 201.96594505, 82.872907469)
            ThreePointArc((-0.079551214, 0.296297256), (-0.030795766, 0.150559576), (0, 0))
            ThreePointArc((0, 0), (0.256101306, -0.033350053), (0.512202613, 0))
        make_face()
    extrude(amount=4.161013063, mode=Mode.SUBTRACT)
    with BuildSketch(Plane(origin=(47.788196764, -41.015423319, -1.280506532), x_dir=(-0.3770302508373224, 0.9262009446948031, 0), z_dir=(0, 0, 1)), Plane(origin=(-47.788196764, 41.015423319, -1.280506532), x_dir=(0.3770302508373224, -0.9262009446948031, 0), z_dir=(0, 0, 1))) as fillet1_piece_9:
        with BuildLine():
            CenterArc((0.367182425, 0.496339425), FILLET1_R, 180.189758693, 82.872907469)
            ThreePointArc((-0.132814833, 0.494683471), (-0.098616779, 0.238694022), (0, 0))
            ThreePointArc((0, 0), (0.153395289, 0.00929786), (0.306790579, 0))
        make_face()
    extrude(amount=4.161013063, mode=Mode.SUBTRACT)

    # M2 Clearance Hole1 (through all)
    with Locations(Plane(origin=(0, 0, 0), x_dir=(-1, 0, 0), z_dir=(0, 0, -1))):
        with Locations((50.5, -27.5), (27.5, -50.5), (-50.5, -27.5), (-27.5, -50.5), (-27.5, 50.5), (-50.5, 27.5), (27.5, 50.5), (50.5, 27.5)):
            Hole(M2_CLEARANCE_HOLE1_D / 2)

    # Sketch12 → interboardConnectorHoles (cut, two sides: drawn at the far end of the back side and taken through both)
    with BuildSketch(Plane.XY.offset(1.6).offset(-INTERBOARDCONNECTORHOLES_DEPTH_BACK)):
        with Locations((27.815, -42.5)):
            Circle(SKETCH12_R)
        with Locations((38.585, -42.5)):
            Circle(SKETCH12_R)
    extrude(amount=INTERBOARDCONNECTORHOLES_DEPTH + INTERBOARDCONNECTORHOLES_DEPTH_BACK, mode=Mode.SUBTRACT)

    # Sketch11 → Cut-Extrude2 (cut, two sides: drawn at the far end of the back side and taken through both)
    with BuildSketch(Plane(origin=(0, 0, 0), x_dir=(-1, 0, 0), z_dir=(0, 0, -1)).offset(-CUT_EXTRUDE2_DEPTH_BACK)):
        Circle(SKETCH11_R)
    extrude(amount=CUT_EXTRUDE2_DEPTH + CUT_EXTRUDE2_DEPTH_BACK, mode=Mode.SUBTRACT)

    # Sketch15 → Cut-Extrude5 (cut)
    with BuildSketch(Plane(origin=(0, 0, 0), x_dir=(-1, 0, 0), z_dir=(0, 0, -1))):
        with Locations((0, 49.9)):
            Rectangle(SKETCH15_W, SKETCH15_H)
        with Locations((0, -49.9)):
            Rectangle(SKETCH15_W, SKETCH15_H)
        with Locations((-50.4, 0)):
            Rectangle(SKETCH15_W_2, SKETCH15_H_2)
        with Locations((50.4, 0)):
            Rectangle(SKETCH15_W_2, SKETCH15_H_2)
    extrude(amount=-CUT_EXTRUDE5_DEPTH, mode=Mode.SUBTRACT)


solid = part.part
